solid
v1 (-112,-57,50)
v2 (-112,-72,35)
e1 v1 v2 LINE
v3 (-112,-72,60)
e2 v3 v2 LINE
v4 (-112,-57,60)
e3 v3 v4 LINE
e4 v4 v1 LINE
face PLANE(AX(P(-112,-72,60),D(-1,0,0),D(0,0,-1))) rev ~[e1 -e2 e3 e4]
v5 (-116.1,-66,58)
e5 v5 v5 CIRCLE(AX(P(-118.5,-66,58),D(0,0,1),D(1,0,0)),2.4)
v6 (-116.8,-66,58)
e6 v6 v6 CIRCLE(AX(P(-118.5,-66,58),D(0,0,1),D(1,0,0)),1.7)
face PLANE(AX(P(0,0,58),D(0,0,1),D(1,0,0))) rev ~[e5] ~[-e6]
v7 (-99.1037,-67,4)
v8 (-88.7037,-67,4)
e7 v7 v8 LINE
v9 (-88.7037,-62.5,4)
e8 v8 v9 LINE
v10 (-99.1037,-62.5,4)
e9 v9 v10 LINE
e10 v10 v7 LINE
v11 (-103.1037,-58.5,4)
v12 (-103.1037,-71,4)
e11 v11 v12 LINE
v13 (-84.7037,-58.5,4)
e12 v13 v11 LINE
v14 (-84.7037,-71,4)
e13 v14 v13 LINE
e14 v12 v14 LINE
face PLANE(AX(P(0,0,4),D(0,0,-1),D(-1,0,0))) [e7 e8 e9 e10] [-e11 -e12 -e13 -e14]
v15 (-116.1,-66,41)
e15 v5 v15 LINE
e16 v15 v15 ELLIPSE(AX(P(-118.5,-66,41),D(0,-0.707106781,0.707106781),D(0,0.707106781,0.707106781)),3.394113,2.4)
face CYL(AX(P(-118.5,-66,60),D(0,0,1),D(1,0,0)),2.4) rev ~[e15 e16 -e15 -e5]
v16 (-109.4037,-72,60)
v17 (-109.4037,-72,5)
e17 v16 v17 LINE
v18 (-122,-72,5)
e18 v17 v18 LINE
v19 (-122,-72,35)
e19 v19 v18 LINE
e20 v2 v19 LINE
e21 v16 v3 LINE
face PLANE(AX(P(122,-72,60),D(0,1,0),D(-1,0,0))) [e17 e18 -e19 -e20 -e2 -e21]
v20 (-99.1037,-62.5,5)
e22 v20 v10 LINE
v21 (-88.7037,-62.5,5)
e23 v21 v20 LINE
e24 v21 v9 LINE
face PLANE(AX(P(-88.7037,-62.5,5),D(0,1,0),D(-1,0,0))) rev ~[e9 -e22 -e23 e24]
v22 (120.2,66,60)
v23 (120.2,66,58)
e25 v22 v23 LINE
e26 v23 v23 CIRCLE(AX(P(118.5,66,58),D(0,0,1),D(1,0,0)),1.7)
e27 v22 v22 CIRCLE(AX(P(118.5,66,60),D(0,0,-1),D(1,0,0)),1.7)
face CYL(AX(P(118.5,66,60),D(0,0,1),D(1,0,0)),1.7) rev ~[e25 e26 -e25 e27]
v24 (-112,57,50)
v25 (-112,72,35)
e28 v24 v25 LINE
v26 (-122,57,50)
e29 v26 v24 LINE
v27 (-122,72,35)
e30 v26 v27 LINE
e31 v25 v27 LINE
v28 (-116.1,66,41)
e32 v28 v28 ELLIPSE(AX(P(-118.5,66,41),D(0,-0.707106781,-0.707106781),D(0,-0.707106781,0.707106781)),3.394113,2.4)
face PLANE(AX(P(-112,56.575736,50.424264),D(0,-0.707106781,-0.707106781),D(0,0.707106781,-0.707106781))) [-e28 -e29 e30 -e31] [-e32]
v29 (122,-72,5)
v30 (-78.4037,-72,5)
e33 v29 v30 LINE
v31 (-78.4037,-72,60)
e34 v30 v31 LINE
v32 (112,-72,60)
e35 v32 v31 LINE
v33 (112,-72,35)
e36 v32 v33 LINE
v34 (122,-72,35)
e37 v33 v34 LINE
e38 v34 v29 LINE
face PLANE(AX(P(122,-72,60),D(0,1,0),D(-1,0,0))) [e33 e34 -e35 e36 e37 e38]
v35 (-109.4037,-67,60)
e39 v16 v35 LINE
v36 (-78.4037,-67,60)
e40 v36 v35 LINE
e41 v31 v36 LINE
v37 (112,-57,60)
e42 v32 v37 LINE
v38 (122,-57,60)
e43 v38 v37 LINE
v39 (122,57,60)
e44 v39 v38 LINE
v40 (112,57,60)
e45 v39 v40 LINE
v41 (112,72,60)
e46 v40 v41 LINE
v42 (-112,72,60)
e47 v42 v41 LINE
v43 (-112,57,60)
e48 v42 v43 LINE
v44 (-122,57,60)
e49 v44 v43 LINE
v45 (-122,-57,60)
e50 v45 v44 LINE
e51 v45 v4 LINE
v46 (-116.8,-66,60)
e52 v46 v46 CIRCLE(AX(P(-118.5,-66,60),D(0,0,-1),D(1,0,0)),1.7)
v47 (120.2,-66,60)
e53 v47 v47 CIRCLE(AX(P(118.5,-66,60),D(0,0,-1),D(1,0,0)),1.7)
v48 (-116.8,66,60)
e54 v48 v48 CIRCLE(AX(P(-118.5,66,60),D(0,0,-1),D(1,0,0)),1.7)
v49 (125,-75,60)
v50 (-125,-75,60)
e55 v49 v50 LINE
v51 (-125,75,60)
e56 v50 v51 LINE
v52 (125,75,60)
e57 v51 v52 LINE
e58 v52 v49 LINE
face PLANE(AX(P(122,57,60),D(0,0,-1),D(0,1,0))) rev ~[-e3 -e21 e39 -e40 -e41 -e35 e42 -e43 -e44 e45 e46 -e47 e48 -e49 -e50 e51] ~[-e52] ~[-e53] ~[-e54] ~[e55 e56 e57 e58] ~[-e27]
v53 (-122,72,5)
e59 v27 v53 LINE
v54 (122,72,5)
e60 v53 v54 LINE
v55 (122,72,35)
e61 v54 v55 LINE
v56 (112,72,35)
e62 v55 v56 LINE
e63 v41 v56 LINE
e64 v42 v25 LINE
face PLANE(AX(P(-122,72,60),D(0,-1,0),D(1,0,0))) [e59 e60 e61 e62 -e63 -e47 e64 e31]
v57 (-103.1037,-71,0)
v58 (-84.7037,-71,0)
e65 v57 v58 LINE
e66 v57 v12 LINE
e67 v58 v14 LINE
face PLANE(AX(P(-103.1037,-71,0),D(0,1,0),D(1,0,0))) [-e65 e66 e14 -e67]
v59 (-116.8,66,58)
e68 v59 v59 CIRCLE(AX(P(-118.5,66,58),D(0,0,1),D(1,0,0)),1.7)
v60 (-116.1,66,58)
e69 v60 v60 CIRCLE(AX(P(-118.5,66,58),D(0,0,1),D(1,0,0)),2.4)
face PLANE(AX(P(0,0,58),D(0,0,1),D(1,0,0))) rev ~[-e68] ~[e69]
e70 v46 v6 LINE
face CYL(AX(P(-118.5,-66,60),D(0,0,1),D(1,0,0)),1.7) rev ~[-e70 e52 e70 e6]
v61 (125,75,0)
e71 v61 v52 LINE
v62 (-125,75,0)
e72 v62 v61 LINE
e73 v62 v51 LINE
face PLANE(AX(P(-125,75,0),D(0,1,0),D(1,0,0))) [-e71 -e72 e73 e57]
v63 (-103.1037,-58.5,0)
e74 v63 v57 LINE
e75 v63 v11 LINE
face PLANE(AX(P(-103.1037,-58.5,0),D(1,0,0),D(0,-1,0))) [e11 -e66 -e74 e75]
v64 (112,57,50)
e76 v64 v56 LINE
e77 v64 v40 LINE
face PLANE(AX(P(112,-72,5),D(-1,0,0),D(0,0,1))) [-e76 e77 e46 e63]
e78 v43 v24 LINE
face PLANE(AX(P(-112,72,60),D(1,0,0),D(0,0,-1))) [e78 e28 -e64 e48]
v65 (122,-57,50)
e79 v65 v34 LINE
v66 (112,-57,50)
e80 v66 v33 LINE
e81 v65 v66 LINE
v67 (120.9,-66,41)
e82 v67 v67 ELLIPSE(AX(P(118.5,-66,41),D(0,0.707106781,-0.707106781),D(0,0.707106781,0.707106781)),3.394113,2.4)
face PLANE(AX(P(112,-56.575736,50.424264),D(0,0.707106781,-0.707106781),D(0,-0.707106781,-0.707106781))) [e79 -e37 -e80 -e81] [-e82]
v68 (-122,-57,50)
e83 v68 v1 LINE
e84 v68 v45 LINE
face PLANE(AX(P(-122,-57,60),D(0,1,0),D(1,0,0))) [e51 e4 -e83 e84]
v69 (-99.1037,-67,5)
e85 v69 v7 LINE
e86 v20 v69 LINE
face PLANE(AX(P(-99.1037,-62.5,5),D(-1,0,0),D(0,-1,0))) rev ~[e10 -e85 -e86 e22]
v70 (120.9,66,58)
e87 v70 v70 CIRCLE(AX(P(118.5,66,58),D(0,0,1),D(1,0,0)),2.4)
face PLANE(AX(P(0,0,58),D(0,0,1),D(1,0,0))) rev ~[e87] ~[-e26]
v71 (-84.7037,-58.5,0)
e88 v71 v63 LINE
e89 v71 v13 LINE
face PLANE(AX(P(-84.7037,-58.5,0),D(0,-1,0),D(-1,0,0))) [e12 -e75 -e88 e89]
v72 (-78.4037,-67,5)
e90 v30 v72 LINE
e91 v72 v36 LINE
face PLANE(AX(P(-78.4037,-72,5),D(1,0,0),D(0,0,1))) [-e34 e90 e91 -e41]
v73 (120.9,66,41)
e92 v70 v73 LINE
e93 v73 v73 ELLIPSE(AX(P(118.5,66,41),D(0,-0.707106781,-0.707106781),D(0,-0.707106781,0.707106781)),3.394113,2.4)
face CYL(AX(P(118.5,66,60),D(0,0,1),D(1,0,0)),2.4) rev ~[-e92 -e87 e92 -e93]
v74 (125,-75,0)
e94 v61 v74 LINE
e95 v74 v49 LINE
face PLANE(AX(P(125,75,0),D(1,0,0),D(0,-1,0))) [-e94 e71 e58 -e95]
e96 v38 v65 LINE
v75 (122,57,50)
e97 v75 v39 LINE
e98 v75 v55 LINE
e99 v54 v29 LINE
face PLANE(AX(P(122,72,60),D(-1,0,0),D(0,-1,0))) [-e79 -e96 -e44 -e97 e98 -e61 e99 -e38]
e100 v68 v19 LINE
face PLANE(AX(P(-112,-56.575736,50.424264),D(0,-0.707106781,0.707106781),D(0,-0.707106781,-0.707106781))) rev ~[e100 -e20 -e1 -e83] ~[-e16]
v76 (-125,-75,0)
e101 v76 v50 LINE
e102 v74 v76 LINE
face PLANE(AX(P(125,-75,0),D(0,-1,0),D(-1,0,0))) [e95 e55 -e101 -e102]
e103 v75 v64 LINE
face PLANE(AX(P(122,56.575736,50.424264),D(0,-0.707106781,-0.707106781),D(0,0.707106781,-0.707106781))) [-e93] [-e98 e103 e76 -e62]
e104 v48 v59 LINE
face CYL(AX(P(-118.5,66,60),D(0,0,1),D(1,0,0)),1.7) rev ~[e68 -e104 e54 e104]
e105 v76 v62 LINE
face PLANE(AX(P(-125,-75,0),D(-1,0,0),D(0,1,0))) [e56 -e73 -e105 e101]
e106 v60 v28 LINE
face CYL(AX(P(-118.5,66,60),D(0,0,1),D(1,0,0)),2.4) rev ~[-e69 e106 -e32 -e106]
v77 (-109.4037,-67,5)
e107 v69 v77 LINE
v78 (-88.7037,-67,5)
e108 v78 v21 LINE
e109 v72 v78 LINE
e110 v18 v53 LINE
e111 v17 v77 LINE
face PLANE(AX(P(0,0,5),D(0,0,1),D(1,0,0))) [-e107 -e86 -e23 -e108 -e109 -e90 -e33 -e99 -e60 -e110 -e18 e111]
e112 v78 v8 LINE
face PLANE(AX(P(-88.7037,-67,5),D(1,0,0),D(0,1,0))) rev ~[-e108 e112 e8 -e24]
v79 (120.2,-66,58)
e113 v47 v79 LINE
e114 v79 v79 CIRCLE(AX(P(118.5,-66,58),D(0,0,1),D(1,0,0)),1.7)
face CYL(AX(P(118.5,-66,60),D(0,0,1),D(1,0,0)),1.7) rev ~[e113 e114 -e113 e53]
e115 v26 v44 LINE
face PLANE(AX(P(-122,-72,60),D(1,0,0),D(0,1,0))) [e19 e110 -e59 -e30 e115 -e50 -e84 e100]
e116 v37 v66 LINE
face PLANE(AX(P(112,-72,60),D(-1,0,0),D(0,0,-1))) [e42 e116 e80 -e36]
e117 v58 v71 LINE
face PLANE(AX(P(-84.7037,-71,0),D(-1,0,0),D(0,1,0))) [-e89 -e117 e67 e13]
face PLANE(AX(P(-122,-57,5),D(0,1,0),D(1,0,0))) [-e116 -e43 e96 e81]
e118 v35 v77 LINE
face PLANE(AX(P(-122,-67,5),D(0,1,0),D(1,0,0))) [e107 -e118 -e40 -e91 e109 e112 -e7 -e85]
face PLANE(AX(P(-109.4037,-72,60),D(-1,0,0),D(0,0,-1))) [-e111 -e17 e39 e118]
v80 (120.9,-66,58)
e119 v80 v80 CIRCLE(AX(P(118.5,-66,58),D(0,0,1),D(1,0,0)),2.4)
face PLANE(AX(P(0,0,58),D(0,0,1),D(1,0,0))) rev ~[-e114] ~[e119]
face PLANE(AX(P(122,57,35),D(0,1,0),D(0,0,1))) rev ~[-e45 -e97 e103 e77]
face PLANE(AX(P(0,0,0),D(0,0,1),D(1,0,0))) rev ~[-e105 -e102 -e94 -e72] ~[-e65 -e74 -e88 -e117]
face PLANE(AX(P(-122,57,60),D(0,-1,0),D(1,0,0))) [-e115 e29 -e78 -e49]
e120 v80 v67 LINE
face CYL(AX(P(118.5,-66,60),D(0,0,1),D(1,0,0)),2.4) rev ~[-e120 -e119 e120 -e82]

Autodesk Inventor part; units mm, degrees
ref_plane "YZ Plane" through (0, 0, 0) normal (1, 0, 0) x (0, 1, 0)
ref_plane "XZ Plane" through (0, 0, 0) normal (0, 1, 0) x (-1, 0, 0)
ref_plane "XY Plane" through (0, 0, 0) normal (0, 0, 1) x (1, 0, 0)
sketch "Sketch7" plane through (0, 0, 0) normal (0, 0, 1) x (1, 0, 0)
  line L0 (125, -75) -> (-125, -75)
  line L1 (-125, -75) -> (-125, 75)
  line L2 (-125, 75) -> (125, 75)
  line L3 (125, 75) -> (125, -75)
  line L4 (125, -75) -> (-125, 75) construction
  line L5 (-125, -75) -> (125, 75) construction
  point P0 (0, 0)
  dimension "d15" = 250
  dimension "d16" = 150
extrude "Box Outside" add sketch "Sketch7" along normal blind 60
sketch "Sketch8" plane through (0, 0, 60) normal (0, 0, 1) x (1, 0, 0)
  line L0 (-122, 72) -> (122, 72)
  line L1 (122, 72) -> (122, -72)
  line L2 (122, -72) -> (-122, -72)
  line L3 (-122, -72) -> (-122, 72)
  line L4 (125, 75) -> (-125, 75) projected
  line L5 (-125, 75) -> (-125, -75) projected
  line L6 (-125, -75) -> (125, -75) projected
  line L7 (125, -75) -> (125, 75) projected
  point P0 (0, 0)
  dimension "d19" = 3
  dimension "d20" = 3
  dimension "d21" = 3
  dimension "d22" = 3
extrude "Box Cut" cut sketch "Sketch8" against normal blind 55 contours L0 L1 L2 L3
sketch "Sketch9" plane through (-122, -72, 60) normal (0, 1, 0) x (1, 0, 0)
  line L0 (0, 0) -> (10, 0)
  line L1 (10, 0) -> (10, 25)
  line L2 (10, 25) -> (0, 25)
  line L3 (0, 25) -> (0, 0)
  point P0 (122, 60)
  dimension "d25" = 10
  dimension "d26" = 25
extrude "ScrewHole Box LB" add sketch "Sketch9" along normal blind 15
sketch "Sketch10" plane through (-122, -72, 5) normal (0, 1, 0) x (1, 0, 0)
  line L0 (244, -55) -> (244, 0) projected
  line L1 (244, -55) -> (234, -55)
  line L2 (234, -55) -> (234, -30)
  line L3 (234, -30) -> (244, -30)
  line L4 (244, -30) -> (244, -55)
  point P0 (122, 5)
  dimension "d29" = 10
  dimension "d30" = 25
extrude "ScrewHole Box RB" add sketch "Sketch10" along normal blind 15
sketch "Sketch11" plane through (-122, 72, 60) normal (0, -1, 0) x (1, 0, 0)
  line L0 (0, 0) -> (244, 0) projected
  line L1 (0, 0) -> (10, 0)
  line L2 (10, 0) -> (10, -25)
  line L3 (10, -25) -> (0, -25)
  line L4 (0, -25) -> (0, 0)
  point P0 (122, -60)
  dimension "d33" = 10
  dimension "d34" = 25
extrude "ScrewHole Box LU" add sketch "Sketch11" along normal blind 15
sketch "Sketch13" plane through (122, -72, 5) normal (-1, 0, 0) x (0, 0, 1)
  line L0 (55, 144) -> (0, 144) projected
  line L1 (55, 144) -> (30, 144)
  line L2 (30, 144) -> (30, 129)
  line L3 (30, 129) -> (55, 129)
  line L4 (55, 129) -> (55, 144)
  point P0 (-5, 72)
  dimension "d37" = 25
  dimension "d38" = 15
extrude "ScrewHole Box RU" add sketch "Sketch13" along normal blind 10
sketch "Sketch27" plane through (0, 0, 60) normal (0, 0, 1) x (1, 0, 0)
  line L0 (-112, -72) -> (-112, -57) projected
  line L1 (-125, 75) -> (-125, -75) projected
  line L2 (-112, -57) -> (-125, -57)
  line L3 (-125, -57) -> (-125, -75)
  line L4 (-125, -75) -> (-112, -75)
  line L5 (-112, -75) -> (-112, -57)
  line L6 (-112, -57) -> (-125, -75)
  line L7 (-112, -75) -> (-125, -57)
  circle A0 centre (-118.5, -66) radius 2.4
  point P0 (0, 0)
  dimension "d84" = 4.8
extrude "Outside ScrewHole LB" cut sketch "Sketch27" against normal blind 26 contours A0 L7 L6 | L6 L7 A0 | A0 L6 L7 | L7 L6 A0
sketch "Sketch29" plane through (0, 0, 60) normal (0, 0, 1) x (1, 0, 0)
  line L0 (-112, -72) -> (-112, -57) projected
  line L1 (-125, -75) -> (125, -75) projected
  line L2 (-112, -57) -> (-125, -57)
  line L3 (-125, -57) -> (-125, -75)
  line L4 (-125, -75) -> (-112, -75)
  line L5 (-112, -75) -> (-112, -57)
  line L6 (-112, -57) -> (-125, -75)
  circle A0 centre (-118.5, -66) radius 2.4
  point P0 (0, 0)
extrude "ScrewRibbon LB" add sketch "Sketch29" against normal blind 2 contours A0 L6 | L6 A0
sketch "Sketch30" plane through (0, 0, 60) normal (0, 0, 1) x (1, 0, 0)
  line L0 (-122, -57) -> (-112, -57) projected
  line L1 (-125, -75) -> (125, -75) projected
  line L2 (-112, -57) -> (-125, -57)
  line L3 (-125, -57) -> (-125, -75)
  line L4 (-125, -75) -> (-112, -75)
  line L5 (-112, -75) -> (-112, -57)
  line L6 (-112, -57) -> (-125, -75)
  circle A0 centre (-118.5, -66) radius 1.7
  point P0 (0, 0)
  dimension "d92" = 3.4
extrude "Inside ScrewHole LB" cut sketch "Sketch30" against normal blind 24 contours A0 L6 | L6 A0
sketch "Sketch31" plane through (0, 0, 60) normal (0, 0, 1) x (1, 0, 0)
  line L0 (-125, 75) -> (-125, -75) projected
  line L1 (-112, 57) -> (-122, 57) projected
  line L2 (-125, 75) -> (-112, 75)
  line L3 (-112, 75) -> (-112, 57)
  line L4 (-112, 57) -> (-125, 57)
  line L5 (-125, 57) -> (-125, 75)
  line L6 (-125, 75) -> (-112, 57)
  circle A0 centre (-118.5, 66) radius 2.4
  point P0 (0, 0)
  dimension "d95" = 4.8
extrude "Outside ScrewHole LU" cut sketch "Sketch31" against normal blind 24 contours A0 L6 | L6 A0
sketch "Sketch32" plane through (0, 0, 60) normal (0, 0, 1) x (1, 0, 0)
  line L0 (-122, 57) -> (-112, 57) projected
  line L1 (-125, 75) -> (-125, -75) projected
  line L2 (-112, 57) -> (-125, 57)
  line L3 (-125, 57) -> (-125, 75)
  line L4 (-125, 75) -> (-112, 75)
  line L5 (-112, 75) -> (-112, 57)
  line L6 (-112, 75) -> (-125, 57)
  circle A0 centre (-118.5, 66) radius 2.4
  point P0 (0, 0)
  dimension "d98" = 4.8
extrude "ScrewRibbon LU" add sketch "Sketch32" against normal blind 2 contours A0 L6 | L6 A0
sketch "Sketch33" plane through (0, 0, 60) normal (0, 0, 1) x (1, 0, 0)
  line L0 (125, 75) -> (-125, 75) projected
  line L1 (-112, 57) -> (-122, 57) projected
  line L2 (-125, 75) -> (-112, 75)
  line L3 (-112, 75) -> (-112, 57)
  line L4 (-112, 57) -> (-125, 57)
  line L5 (-125, 57) -> (-125, 75)
  line L6 (-125, 75) -> (-112, 57)
  circle A0 centre (-118.5, 66) radius 1.7
  point P0 (0, 0)
  dimension "d101" = 3.4
extrude "Inside ScrewHole LU" cut sketch "Sketch33" against normal blind 21.75 contours A0 L6 | L6 A0
sketch "Sketch34" plane through (0, 0, 60) normal (0, 0, 1) x (1, 0, 0)
  line L0 (112, 57) -> (112, 72) projected
  line L1 (125, 75) -> (-125, 75) projected
  line L2 (112, 57) -> (125, 57)
  line L3 (125, 57) -> (125, 75)
  line L4 (125, 75) -> (112, 75)
  line L5 (112, 75) -> (112, 57)
  line L6 (125, 75) -> (112, 57)
  circle A0 centre (118.5, 66) radius 2.4
  point P0 (0, 0)
  dimension "d104" = 4.8
extrude "Outside ScrewHole RU" cut sketch "Sketch34" against normal blind 37 contours A0 L6 | L6 A0
sketch "Sketch35" plane through (0, 0, 60) normal (0, 0, 1) x (1, 0, 0)
  line L0 (125, -75) -> (125, 75) projected
  line L1 (122, 57) -> (112, 57) projected
  line L2 (125, 75) -> (112, 75)
  line L3 (112, 75) -> (112, 57)
  line L4 (112, 57) -> (125, 57)
  line L5 (125, 57) -> (125, 75)
  line L6 (125, 75) -> (-125, 75) projected
  line L7 (125, 75) -> (112, 57)
  circle A0 centre (118.5, 66) radius 2.4
  point P0 (0, 0)
  dimension "d107" = 4.8
extrude "ScrewRibbon RU" add sketch "Sketch35" against normal blind 2 contours A0 L7 | L7 A0
sketch "Sketch36" plane through (0, 0, 60) normal (0, 0, 1) x (1, 0, 0)
  line L0 (122, 57) -> (112, 57) projected
  line L1 (125, -75) -> (125, 75) projected
  line L2 (112, 57) -> (125, 57)
  line L3 (125, 57) -> (125, 75)
  line L4 (125, 75) -> (112, 75)
  line L5 (112, 75) -> (112, 57)
  line L6 (112, 57) -> (125, 75)
  circle A0 centre (118.5, 66) radius 2.4 projected
  circle A1 centre (118.5, 66) radius 1.7
  point P0 (0, 0)
  dimension "d110" = 3.4
extrude "Inside ScrewHole RU" cut sketch "Sketch36" against normal blind 20 contours A1 L6 | L6 A1
sketch "Sketch37" plane through (0, 0, 60) normal (0, 0, 1) x (1, 0, 0)
  line L0 (125, -75) -> (125, 75) projected
  line L1 (112, -72) -> (112, -57) projected
  line L2 (125, -75) -> (112, -75)
  line L3 (112, -75) -> (112, -57)
  line L4 (112, -57) -> (125, -57)
  line L5 (125, -57) -> (125, -75)
  line L6 (112, -75) -> (125, -57)
  circle A0 centre (118.5, -66) radius 2.4
  point P0 (0, 0)
  dimension "d113" = 4.8
extrude "Outside ScrewHole RB" cut sketch "Sketch37" against normal blind 27.5 contours A0 L6 | L6 A0
sketch "Sketch38" plane through (0, 0, 60) normal (0, 0, 1) x (1, 0, 0)
  line L0 (122, -57) -> (112, -57) projected
  line L1 (125, -75) -> (125, 75) projected
  line L2 (112, -57) -> (125, -57)
  line L3 (125, -57) -> (125, -75)
  line L4 (125, -75) -> (112, -75)
  line L5 (112, -75) -> (112, -57)
  line L6 (125, -57) -> (112, -75)
  circle A0 centre (118.5, -66) radius 2.4
  point P0 (0, 0)
  dimension "d116" = 4.8
extrude "ScrewRibbon RB" add sketch "Sketch38" against normal blind 2 contours A0 L6 | L6 A0
sketch "Sketch39" plane through (0, 0, 60) normal (0, 0, 1) x (1, 0, 0)
  line L0 (112, -72) -> (112, -57) projected
  line L1 (125, -75) -> (125, 75) projected
  line L2 (112, -57) -> (125, -57)
  line L3 (125, -57) -> (125, -75)
  line L4 (125, -75) -> (112, -75)
  line L5 (112, -75) -> (112, -57)
  line L6 (112, -75) -> (125, -57)
  circle A0 centre (118.5, -66) radius 2.4 projected
  circle A1 centre (118.5, -66) radius 1.7
  point P0 (0, 0)
  dimension "d119" = 3.4
extrude "Inside ScrewHole RB" cut sketch "Sketch39" against normal blind 20 contours A1 L6 | L6 A1
sketch "Sketch42" plane through (-122, -72, 5) normal (0, 1, 0) x (1, 0, 0)
  line L0 (244, 0) -> (0, 0) projected
  line L1 (12.5963, 0) -> (43.5963, 0)
  line L2 (43.5963, 0) -> (43.5963, -55)
  line L3 (43.5963, -55) -> (12.5963, -55)
  line L4 (12.5963, -55) -> (12.5963, 0)
  point P0 (122, 5)
  point P1 (43.5963, 0)
  dimension "d134" = 31
  dimension "d135" = 55
extrude "ESPHolder" add sketch "Sketch42" along normal blind 5
sketch "Sketch43" plane through (0, 0, 5) normal (0, 0, 1) x (1, 0, 0)
  line L0 (-109.4037, -67) -> (-78.4037, -67) projected
  line L1 (-99.1037, -67) -> (-88.7037, -67)
  line L2 (-88.7037, -67) -> (-88.7037, -62.5)
  line L3 (-88.7037, -62.5) -> (-99.1037, -62.5)
  line L4 (-99.1037, -62.5) -> (-99.1037, -67)
  line L5 (-78.4037, -67) -> (-109.4037, -67)
  line L6 (-109.4037, -67) -> (-109.4037, -51.7804)
  line L7 (-109.4037, -51.7804) -> (-78.4037, -51.7804)
  line L8 (-78.4037, -51.7804) -> (-78.4037, -67)
  point P0 (0, 0)
  dimension "d138" = 10.3
  dimension "d139" = 10.3
  dimension "d140" = 4.5
extrude "PortHole" cut sketch "Sketch43" against normal through all contours L4 L3 L2 L0
sketch "Sketch44" plane through (0, 0, 0) normal (0, 0, -1) x (-1, 0, 0)
  line L0 (84.7037, -58.5) -> (103.1037, -58.5)
  line L1 (103.1037, -58.5) -> (103.1037, -71)
  line L2 (103.1037, -71) -> (84.7037, -71)
  line L3 (84.7037, -71) -> (84.7037, -58.5)
  line L4 (88.7037, -62.5) -> (99.1037, -62.5) projected
  line L5 (99.1037, -67) -> (88.7037, -67) projected
  line L6 (99.1037, -62.5) -> (99.1037, -67) projected
  line L7 (88.7037, -67) -> (88.7037, -62.5) projected
  point P0 (0, 0)
  dimension "d143" = 4
  dimension "d144" = 4
  dimension "d145" = 4
  dimension "d146" = 4
extrude "Extrusion29" cut sketch "Sketch44" against normal blind 4
chamfer "Chamfer1" distance 15 angle 45 1 edges at (-117, -57, 35)
chamfer "Chamfer2" distance 15 angle 45 1 edges at (-117, 57, 35)
chamfer "Chamfer3" distance 15 angle 45 1 edges at (117, 57, 35)
chamfer "Chamfer4" distance 15 angle 45 1 edges at (117, -57, 35)
properties part number "Box"
